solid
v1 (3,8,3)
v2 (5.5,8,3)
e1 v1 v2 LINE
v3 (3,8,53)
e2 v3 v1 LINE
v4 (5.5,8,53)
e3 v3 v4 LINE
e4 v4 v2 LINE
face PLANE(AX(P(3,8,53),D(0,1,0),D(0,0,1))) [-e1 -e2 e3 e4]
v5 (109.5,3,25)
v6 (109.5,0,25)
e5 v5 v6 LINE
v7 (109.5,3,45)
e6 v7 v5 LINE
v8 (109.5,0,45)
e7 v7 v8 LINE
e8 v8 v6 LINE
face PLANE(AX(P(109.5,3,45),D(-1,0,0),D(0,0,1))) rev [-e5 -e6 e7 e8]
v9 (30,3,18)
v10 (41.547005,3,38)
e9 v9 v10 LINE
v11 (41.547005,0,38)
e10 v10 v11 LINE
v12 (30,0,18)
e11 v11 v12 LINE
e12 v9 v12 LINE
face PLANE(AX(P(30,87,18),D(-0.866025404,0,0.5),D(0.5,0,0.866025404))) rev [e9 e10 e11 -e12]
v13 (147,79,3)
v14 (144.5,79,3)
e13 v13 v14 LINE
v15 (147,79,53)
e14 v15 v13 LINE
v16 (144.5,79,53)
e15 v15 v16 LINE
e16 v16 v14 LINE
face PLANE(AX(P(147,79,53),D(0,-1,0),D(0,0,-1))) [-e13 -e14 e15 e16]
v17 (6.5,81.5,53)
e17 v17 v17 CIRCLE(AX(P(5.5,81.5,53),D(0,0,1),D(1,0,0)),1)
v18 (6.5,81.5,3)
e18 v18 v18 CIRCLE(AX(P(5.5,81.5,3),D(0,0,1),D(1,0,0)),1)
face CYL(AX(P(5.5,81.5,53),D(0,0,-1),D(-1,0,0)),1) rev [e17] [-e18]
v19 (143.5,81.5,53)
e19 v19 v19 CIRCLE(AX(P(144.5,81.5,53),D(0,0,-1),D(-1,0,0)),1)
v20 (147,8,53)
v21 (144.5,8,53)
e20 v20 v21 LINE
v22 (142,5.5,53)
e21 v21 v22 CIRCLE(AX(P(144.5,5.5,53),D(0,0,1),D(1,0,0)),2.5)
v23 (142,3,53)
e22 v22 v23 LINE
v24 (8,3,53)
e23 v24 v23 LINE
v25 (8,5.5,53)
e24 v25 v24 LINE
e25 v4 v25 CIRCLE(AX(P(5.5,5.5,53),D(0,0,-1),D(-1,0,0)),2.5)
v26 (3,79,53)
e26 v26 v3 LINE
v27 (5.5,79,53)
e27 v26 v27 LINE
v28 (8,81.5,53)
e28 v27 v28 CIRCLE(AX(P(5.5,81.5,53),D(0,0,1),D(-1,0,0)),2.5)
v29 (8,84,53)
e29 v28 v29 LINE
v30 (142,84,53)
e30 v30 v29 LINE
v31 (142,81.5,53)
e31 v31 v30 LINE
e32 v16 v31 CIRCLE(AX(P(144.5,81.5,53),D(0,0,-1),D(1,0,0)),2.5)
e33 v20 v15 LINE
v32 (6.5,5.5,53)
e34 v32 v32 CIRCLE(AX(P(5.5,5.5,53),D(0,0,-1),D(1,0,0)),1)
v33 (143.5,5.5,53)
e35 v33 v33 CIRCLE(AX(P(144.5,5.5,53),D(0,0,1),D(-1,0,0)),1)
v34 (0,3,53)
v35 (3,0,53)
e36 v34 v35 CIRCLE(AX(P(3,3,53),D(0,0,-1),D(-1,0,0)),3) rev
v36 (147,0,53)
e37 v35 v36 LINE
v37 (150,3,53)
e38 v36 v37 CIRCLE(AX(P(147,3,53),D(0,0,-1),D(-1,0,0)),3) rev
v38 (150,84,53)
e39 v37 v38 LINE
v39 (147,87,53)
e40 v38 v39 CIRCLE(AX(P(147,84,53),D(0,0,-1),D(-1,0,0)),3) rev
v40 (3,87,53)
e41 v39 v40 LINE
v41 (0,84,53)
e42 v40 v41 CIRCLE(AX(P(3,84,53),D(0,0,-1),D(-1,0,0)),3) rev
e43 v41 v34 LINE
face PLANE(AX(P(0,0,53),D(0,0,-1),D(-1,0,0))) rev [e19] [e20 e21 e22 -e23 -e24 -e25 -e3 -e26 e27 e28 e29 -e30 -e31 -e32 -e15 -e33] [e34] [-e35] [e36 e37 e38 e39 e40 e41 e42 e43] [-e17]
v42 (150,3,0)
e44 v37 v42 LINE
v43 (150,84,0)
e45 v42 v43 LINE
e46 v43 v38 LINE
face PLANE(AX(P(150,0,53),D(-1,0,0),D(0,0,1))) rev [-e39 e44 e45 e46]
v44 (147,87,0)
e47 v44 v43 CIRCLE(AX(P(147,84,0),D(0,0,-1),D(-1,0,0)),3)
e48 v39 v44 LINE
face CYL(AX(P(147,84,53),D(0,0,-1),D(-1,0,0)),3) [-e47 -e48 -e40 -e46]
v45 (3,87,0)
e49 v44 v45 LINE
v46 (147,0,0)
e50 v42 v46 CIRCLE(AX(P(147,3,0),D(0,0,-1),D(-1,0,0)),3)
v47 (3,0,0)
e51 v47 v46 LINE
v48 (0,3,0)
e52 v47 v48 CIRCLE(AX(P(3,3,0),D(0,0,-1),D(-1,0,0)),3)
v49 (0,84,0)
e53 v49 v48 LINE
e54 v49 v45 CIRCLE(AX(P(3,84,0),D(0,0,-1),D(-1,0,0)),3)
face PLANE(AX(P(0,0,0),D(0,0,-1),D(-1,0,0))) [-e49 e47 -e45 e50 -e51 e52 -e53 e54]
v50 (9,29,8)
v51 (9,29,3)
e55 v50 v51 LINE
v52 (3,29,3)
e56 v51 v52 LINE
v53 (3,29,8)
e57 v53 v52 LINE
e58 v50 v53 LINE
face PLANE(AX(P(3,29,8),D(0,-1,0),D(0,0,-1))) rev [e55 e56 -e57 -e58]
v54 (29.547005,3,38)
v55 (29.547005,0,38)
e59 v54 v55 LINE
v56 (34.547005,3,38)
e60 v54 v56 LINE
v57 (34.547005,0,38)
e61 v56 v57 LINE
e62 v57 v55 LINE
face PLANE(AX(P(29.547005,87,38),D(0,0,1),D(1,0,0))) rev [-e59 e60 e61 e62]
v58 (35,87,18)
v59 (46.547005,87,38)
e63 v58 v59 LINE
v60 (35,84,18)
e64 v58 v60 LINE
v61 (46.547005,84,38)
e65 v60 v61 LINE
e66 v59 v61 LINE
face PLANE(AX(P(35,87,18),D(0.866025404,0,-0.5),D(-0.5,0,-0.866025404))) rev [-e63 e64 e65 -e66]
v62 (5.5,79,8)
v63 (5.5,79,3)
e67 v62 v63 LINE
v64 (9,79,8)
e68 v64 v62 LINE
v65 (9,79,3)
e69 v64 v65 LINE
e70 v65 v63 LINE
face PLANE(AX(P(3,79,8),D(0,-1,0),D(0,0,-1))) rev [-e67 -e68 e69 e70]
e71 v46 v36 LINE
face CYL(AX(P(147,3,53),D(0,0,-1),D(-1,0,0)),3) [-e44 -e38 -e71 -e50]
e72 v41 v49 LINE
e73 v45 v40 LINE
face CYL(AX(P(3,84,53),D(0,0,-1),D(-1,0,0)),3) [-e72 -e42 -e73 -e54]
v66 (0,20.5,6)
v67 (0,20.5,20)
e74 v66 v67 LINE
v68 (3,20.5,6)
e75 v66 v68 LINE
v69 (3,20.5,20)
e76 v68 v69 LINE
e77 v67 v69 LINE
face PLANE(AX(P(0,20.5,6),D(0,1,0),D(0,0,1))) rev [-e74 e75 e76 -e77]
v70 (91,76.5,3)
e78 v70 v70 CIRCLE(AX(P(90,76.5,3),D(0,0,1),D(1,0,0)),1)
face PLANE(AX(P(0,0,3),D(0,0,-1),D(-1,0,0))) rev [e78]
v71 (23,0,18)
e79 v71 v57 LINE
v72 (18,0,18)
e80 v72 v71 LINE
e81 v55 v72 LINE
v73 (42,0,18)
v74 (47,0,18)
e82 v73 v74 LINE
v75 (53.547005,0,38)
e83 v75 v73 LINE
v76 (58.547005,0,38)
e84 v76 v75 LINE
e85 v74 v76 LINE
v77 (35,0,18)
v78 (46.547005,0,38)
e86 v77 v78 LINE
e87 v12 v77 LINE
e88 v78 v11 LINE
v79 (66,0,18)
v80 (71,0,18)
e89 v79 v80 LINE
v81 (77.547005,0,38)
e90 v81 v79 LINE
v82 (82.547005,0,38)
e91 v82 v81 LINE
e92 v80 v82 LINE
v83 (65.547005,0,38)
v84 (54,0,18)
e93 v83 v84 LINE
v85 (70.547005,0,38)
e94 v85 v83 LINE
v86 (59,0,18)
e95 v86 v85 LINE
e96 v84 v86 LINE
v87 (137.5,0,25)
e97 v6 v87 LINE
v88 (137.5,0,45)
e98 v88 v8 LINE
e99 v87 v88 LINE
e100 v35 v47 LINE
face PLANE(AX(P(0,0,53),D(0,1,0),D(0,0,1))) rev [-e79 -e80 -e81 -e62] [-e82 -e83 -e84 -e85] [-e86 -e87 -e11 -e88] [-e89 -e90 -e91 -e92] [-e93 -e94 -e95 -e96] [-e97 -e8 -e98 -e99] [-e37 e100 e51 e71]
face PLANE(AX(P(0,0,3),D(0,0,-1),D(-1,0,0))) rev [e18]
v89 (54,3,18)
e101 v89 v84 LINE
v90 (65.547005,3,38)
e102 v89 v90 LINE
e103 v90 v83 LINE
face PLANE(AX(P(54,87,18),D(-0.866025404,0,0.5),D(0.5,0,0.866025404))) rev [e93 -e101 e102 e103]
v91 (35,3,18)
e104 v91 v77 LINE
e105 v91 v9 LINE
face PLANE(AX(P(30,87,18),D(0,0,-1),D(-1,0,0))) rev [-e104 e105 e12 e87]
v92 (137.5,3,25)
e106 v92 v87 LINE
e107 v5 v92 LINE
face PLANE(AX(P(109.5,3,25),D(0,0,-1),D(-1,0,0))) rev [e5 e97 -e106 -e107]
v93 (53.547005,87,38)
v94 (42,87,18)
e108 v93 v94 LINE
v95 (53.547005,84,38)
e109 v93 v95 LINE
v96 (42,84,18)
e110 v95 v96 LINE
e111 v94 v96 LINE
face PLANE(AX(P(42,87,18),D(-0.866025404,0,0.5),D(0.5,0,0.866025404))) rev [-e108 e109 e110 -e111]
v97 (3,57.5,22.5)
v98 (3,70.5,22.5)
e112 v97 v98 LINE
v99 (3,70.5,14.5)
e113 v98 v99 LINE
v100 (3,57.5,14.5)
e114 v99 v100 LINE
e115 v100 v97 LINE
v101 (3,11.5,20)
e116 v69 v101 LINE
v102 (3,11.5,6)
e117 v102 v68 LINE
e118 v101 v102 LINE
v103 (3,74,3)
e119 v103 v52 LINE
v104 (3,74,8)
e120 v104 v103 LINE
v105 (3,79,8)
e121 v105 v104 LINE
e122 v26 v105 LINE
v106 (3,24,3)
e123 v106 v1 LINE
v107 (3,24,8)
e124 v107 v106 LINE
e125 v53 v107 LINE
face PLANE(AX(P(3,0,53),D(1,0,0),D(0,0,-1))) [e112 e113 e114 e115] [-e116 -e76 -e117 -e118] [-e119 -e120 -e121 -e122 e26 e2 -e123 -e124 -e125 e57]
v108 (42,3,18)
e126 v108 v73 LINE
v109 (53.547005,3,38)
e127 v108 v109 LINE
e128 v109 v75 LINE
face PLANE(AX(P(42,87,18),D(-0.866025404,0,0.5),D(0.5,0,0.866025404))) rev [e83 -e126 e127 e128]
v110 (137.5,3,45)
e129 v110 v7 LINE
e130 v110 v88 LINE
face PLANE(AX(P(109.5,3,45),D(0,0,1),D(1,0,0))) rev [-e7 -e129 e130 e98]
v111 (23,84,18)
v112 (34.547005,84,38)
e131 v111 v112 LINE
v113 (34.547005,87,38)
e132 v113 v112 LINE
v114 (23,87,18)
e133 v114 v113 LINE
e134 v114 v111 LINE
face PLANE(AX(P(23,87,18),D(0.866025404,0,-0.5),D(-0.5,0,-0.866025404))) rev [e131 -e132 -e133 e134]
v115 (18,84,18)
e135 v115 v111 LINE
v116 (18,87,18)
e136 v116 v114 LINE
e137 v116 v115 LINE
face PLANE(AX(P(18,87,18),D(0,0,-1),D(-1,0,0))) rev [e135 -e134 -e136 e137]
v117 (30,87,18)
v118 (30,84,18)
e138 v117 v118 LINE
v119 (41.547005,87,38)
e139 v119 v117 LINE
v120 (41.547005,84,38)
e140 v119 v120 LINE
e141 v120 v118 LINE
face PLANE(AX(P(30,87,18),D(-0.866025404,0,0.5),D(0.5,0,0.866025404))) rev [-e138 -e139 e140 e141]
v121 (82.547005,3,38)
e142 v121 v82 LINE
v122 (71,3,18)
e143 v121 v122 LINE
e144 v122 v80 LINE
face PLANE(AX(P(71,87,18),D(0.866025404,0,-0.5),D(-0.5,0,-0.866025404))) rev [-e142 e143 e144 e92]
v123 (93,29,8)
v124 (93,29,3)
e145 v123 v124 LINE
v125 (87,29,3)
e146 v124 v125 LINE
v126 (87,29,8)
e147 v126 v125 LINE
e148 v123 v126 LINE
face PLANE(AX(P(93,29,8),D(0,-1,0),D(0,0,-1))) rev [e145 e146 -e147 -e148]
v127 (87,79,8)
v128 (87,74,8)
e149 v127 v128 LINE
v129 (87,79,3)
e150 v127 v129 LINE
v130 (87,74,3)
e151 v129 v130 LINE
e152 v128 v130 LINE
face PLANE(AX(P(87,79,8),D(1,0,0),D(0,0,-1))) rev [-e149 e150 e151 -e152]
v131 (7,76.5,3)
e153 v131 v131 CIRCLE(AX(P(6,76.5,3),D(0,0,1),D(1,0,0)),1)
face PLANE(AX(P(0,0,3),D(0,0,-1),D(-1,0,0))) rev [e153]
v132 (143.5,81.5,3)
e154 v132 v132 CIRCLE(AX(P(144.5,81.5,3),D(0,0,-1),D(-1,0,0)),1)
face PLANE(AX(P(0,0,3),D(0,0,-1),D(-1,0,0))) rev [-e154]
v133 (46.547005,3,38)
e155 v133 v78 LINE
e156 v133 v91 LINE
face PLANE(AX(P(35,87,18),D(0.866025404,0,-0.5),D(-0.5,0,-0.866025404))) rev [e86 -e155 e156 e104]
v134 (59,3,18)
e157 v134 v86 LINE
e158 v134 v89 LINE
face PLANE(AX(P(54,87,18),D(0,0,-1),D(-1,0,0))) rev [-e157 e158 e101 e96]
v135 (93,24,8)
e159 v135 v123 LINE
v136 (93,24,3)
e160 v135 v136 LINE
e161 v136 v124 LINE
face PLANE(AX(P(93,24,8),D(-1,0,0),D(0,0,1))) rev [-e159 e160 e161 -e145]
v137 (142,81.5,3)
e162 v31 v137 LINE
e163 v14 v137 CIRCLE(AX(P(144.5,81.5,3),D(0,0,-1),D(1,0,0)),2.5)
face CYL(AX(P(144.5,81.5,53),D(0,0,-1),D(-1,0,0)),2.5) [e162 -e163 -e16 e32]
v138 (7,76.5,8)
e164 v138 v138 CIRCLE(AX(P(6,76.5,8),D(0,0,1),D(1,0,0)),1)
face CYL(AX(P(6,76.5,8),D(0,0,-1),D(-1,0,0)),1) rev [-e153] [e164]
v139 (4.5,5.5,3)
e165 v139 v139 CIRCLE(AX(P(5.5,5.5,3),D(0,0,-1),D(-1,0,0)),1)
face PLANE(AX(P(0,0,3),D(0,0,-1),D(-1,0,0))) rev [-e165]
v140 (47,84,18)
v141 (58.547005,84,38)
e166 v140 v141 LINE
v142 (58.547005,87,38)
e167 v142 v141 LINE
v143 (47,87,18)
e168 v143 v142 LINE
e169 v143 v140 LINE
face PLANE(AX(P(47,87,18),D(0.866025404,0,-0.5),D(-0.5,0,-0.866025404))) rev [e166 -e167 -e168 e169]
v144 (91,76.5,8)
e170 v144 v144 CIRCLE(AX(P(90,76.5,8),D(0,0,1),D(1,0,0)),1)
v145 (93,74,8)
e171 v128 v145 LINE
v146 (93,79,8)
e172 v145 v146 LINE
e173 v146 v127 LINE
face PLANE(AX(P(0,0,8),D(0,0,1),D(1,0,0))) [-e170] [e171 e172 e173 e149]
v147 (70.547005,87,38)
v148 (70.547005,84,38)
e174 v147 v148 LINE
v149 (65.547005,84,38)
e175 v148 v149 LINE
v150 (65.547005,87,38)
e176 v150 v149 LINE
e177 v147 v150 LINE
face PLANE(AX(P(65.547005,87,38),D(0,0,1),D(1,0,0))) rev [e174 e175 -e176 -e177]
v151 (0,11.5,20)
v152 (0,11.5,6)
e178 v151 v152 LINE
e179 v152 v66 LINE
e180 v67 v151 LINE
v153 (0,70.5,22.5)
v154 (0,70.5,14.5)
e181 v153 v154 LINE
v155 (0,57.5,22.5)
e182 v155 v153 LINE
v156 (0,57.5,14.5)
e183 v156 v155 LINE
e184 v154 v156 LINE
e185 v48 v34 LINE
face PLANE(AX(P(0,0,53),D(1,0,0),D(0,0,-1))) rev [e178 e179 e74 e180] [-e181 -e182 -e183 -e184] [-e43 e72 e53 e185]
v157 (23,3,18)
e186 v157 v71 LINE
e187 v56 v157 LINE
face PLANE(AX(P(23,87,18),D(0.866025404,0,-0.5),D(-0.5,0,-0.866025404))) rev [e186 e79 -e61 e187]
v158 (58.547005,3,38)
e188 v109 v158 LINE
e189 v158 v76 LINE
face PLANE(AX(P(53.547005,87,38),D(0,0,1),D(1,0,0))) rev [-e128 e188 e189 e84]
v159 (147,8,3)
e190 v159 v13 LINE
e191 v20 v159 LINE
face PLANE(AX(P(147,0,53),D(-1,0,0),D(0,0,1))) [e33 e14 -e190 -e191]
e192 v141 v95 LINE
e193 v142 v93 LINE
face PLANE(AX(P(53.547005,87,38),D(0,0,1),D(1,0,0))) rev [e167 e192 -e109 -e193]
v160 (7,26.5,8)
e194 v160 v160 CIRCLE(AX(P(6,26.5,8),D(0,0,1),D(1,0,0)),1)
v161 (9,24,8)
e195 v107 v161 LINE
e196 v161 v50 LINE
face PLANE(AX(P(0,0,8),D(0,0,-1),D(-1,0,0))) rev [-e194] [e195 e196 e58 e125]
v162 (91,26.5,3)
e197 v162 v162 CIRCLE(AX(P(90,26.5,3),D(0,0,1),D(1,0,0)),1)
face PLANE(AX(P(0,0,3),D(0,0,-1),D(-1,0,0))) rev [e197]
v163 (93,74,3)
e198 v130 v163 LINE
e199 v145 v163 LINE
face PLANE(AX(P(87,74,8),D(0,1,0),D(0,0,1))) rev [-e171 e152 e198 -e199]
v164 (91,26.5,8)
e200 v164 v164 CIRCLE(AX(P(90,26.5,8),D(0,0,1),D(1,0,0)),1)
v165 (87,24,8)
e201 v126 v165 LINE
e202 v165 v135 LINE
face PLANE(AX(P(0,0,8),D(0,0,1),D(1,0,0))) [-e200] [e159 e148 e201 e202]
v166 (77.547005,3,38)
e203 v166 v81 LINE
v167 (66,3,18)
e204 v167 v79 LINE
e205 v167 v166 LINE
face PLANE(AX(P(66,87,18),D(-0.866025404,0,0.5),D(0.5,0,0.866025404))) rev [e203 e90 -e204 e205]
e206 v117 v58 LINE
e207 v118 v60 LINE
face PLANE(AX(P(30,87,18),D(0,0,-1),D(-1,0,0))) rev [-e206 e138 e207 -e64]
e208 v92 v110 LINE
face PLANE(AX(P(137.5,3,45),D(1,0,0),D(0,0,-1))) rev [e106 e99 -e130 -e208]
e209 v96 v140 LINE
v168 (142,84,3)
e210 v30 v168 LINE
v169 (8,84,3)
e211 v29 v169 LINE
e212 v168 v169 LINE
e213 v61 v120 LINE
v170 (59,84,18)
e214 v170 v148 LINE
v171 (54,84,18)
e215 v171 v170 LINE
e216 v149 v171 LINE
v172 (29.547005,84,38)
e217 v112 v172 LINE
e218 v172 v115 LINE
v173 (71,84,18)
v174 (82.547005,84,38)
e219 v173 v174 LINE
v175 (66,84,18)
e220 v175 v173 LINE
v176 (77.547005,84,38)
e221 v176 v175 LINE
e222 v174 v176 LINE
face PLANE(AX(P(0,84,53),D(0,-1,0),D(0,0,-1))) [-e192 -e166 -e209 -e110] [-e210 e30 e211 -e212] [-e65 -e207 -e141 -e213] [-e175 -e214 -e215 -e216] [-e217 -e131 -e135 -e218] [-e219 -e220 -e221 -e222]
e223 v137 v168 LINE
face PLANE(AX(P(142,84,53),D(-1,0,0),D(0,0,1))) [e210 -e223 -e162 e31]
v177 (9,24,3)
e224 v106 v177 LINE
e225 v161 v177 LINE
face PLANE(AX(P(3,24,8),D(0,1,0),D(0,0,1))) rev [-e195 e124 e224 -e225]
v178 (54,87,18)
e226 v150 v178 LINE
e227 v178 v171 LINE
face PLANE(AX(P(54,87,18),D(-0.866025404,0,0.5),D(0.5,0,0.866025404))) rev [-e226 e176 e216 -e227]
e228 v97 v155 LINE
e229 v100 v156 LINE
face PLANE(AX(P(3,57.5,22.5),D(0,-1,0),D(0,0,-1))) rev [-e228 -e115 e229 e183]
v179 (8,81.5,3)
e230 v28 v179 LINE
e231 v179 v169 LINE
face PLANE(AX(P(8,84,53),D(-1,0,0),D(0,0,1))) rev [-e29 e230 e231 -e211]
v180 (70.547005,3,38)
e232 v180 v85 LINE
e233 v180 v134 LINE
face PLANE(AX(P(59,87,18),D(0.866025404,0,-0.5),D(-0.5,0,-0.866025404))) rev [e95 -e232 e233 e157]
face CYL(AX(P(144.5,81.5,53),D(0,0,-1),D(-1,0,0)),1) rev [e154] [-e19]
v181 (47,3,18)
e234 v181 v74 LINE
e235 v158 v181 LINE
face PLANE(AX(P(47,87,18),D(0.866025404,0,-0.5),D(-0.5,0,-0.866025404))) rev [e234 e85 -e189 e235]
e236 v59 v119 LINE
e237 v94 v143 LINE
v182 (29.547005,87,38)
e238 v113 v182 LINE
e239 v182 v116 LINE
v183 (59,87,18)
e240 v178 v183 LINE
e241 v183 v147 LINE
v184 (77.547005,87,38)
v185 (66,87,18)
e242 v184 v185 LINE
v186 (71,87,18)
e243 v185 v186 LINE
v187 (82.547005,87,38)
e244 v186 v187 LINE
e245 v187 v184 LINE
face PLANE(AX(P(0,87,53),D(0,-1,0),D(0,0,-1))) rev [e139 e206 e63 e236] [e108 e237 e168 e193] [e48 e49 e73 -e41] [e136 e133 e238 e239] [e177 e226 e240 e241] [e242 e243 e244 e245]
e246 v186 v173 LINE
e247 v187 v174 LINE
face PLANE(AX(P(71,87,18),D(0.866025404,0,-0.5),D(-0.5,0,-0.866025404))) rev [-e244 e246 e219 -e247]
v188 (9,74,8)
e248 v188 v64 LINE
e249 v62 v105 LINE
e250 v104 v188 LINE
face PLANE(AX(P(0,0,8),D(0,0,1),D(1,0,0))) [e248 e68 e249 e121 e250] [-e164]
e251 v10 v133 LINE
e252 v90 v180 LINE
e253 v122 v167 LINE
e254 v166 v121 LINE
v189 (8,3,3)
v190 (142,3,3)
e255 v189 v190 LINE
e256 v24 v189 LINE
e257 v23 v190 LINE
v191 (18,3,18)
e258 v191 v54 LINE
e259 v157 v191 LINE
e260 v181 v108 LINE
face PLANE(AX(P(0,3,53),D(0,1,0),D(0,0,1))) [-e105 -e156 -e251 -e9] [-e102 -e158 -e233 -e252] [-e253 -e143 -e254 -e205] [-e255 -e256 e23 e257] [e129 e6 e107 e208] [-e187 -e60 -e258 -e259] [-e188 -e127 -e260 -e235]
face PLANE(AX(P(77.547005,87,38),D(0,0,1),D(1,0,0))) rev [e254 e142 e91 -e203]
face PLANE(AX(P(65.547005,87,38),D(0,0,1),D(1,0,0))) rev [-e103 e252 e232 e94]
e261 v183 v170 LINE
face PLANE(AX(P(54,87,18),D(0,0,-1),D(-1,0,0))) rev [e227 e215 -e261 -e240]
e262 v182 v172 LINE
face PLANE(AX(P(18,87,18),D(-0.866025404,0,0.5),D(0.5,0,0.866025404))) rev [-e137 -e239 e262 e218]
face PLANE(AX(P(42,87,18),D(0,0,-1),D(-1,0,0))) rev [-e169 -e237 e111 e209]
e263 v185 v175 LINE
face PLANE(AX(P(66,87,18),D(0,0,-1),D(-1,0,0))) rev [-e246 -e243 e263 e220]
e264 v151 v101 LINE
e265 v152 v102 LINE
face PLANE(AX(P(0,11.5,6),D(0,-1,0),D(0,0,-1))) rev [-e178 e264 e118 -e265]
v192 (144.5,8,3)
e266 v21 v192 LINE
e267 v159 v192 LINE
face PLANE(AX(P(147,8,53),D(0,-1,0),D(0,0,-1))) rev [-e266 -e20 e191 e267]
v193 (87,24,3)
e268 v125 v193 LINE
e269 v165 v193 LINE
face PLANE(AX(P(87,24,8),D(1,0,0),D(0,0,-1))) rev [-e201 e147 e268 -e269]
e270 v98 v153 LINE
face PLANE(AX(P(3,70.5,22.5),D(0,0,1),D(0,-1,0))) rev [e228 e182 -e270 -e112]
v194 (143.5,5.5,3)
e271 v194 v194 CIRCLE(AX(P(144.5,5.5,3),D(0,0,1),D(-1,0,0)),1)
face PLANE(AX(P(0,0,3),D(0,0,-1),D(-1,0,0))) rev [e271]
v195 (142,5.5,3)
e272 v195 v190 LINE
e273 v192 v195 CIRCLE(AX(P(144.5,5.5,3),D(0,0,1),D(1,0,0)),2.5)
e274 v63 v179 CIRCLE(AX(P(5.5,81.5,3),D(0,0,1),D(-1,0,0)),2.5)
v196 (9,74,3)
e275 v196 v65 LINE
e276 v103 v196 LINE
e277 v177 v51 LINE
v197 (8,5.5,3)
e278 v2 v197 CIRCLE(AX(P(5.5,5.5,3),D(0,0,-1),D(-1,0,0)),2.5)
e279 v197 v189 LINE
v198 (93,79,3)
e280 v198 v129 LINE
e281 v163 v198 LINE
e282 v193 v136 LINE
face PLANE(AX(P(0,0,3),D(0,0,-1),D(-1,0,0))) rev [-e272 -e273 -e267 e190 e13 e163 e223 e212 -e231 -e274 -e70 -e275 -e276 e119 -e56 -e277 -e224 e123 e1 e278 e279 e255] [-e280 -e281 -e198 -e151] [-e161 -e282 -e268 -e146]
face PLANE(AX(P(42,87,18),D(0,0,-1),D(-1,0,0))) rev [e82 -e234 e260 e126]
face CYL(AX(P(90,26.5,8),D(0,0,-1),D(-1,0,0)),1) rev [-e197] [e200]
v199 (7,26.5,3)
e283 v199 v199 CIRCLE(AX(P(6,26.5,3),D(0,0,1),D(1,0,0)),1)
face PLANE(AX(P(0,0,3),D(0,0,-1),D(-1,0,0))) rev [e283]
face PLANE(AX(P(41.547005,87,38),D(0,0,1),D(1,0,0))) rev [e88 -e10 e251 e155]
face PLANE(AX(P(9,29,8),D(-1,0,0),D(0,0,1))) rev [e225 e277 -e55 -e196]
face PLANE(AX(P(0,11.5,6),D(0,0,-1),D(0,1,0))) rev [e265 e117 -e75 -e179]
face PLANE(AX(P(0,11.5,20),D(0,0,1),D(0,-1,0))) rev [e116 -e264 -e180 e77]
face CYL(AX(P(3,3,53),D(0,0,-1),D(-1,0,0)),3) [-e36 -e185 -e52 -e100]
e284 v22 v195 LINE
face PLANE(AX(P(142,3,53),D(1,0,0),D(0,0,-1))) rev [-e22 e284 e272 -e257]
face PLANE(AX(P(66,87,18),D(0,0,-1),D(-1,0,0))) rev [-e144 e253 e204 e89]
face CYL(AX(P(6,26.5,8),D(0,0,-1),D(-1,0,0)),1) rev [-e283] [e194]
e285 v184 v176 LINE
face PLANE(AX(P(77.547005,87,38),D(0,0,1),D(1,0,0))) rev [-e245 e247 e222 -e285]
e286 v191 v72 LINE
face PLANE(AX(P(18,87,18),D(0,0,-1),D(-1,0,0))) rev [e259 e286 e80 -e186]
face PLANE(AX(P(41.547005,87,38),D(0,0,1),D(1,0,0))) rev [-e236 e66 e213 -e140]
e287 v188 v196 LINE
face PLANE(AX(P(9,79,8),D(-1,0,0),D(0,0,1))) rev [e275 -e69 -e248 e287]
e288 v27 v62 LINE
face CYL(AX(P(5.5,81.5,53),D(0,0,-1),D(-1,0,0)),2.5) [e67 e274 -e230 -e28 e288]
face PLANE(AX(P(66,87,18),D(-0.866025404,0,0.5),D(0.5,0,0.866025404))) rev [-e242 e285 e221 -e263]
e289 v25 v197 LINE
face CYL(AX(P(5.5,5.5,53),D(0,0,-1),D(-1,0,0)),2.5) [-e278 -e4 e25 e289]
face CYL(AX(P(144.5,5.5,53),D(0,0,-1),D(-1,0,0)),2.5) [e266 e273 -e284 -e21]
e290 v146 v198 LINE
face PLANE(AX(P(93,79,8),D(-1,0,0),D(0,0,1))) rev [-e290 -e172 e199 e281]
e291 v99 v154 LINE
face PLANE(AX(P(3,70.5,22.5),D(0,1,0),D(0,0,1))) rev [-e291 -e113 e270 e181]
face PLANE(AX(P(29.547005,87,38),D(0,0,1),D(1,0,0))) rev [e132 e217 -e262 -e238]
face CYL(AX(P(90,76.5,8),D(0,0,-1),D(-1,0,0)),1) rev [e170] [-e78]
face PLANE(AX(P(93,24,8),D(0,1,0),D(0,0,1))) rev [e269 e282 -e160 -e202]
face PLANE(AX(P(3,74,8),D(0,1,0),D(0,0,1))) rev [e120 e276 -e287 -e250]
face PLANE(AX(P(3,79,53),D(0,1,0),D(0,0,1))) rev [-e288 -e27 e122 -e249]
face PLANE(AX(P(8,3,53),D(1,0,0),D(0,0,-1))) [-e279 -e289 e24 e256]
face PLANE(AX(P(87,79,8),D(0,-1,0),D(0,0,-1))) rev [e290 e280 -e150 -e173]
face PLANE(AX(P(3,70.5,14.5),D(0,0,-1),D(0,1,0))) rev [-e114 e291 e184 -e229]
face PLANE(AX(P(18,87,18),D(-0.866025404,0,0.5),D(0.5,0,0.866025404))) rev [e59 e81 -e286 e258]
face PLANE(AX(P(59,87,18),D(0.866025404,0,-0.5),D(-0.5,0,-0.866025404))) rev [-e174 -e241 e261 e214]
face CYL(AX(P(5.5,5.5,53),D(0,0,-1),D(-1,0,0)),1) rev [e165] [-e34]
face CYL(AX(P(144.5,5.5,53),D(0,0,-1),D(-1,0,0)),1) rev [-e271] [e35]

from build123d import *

# Parameters (mm, degrees)
SKETCH1_W               = 150
SKETCH1_H               = 87
BODY_FRAME_DEPTH        = 53
BODY_EDGES_R            = 3
SHELL1_START            = 3
SHELL1_OUTLINE_W        = 81
SHELL1_OUTLINE_H        = 50
SHELL1_DEPTH            = 144
SKETCH3_R               = 1
SCREW_HOLE_DEPTH        = 50
MIRROR2_COPY_1_SKETCH_R = 1
MIRROR2_COPY_1_DEPTH    = 50
SKETCH4_W               = 6
SKETCH4_H               = 5
SKETCH4_R               = 1
BOSS_EXTRUDE3_DEPTH     = 5
SKETCH5_W               = 14
SKETCH5_H               = 9
SWITCH_DEPTH            = 179.849098404
SKETCH6_W               = 28
SKETCH6_H               = 20
AC_IN_DEPTH             = 3
SKETCH8_W               = 8
SKETCH8_H               = 13
PROGRAM_PORT_DEPTH      = 3
CUT_EXTRUDE1_DEPTH      = 182.322916367
LPATTERN1_COUNT         = 5
LPATTERN1_PITCH         = 12


# Read off the part's stored shape, not the designer's step: Shell1
with BuildPart() as part:
    # Sketch1 → Body_frame (new body)
    with BuildSketch(Plane.XY):
        with Locations((75, 43.5)):
            Rectangle(SKETCH1_W, SKETCH1_H)
    extrude(amount=BODY_FRAME_DEPTH)

    # body_edges
    body_edges_edges = [part.edges().sort_by_distance(p)[0] for p in [
        (0, 87, 26.5),
        (150, 87, 26.5),
        (150, 0, 26.5),
        (0, 0, 26.5),
    ]]
    fillet(body_edges_edges, radius=BODY_EDGES_R)

    # Shell1 outline → Shell1 (cut)
    with BuildSketch(Plane.YZ.offset(SHELL1_START)):
        with Locations((43.5, 28)):
            Rectangle(SHELL1_OUTLINE_W, SHELL1_OUTLINE_H)
    extrude(amount=SHELL1_DEPTH, mode=Mode.SUBTRACT)

    # Sketch3 → screw_hole (add)
    with BuildSketch(Plane.XY.offset(3)):
        with BuildLine():
            Line((3, 84), (8, 84))
            Line((8, 84), (8, 81.5))
            ThreePointArc((8, 81.5), (7.267766953, 79.732233047), (5.5, 79))
            Line((5.5, 79), (3, 79))
            Line((3, 79), (3, 84))
        make_face()
        with Locations((5.5, 81.5)):
            Circle(SKETCH3_R, mode=Mode.SUBTRACT)
    screw_hole = extrude(amount=SCREW_HOLE_DEPTH)

    # Mirror1: screw_hole across plane
    add(screw_hole.mirror(Plane.ZY.offset(-75)))

    # Mirror2: screw_hole across plane
    add(screw_hole.mirror(Plane.ZX.offset(43.5)))

    # Mirror2 copy 1 sketch → Mirror2 copy 1 (add)
    with BuildSketch(Plane(origin=(150, 87, 3), x_dir=(-1, 0, 0), z_dir=(0, 0, 1))):
        with BuildLine():
            Line((3, 84), (8, 84))
            Line((8, 84), (8, 81.5))
            ThreePointArc((8, 81.5), (7.267766953, 79.732233047), (5.5, 79))
            Line((5.5, 79), (3, 79))
            Line((3, 79), (3, 84))
        make_face()
        with Locations((5.5, 81.5)):
            Circle(MIRROR2_COPY_1_SKETCH_R, mode=Mode.SUBTRACT)
    extrude(amount=MIRROR2_COPY_1_DEPTH)

    # Sketch4 → Boss-Extrude3 (add)
    # profile 1 of 4: a face of its own
    with BuildSketch(Plane.XY.offset(3)):
        with Locations((6, 76.5)):
            Rectangle(SKETCH4_W, SKETCH4_H)
        with Locations((6, 76.5)):
            Circle(SKETCH4_R, mode=Mode.SUBTRACT)
    # profile 2 of 4: a face of its own
    with BuildSketch(Plane.XY.offset(3)):
        with Locations((90, 76.5)):
            Rectangle(SKETCH4_W, SKETCH4_H)
        with Locations((90, 76.5)):
            Circle(SKETCH4_R, mode=Mode.SUBTRACT)
    # profile 3 of 4: a face of its own
    with BuildSketch(Plane.XY.offset(3)):
        with Locations((6, 26.5)):
            Rectangle(SKETCH4_W, SKETCH4_H)
        with Locations((6, 26.5)):
            Circle(SKETCH4_R, mode=Mode.SUBTRACT)
    # profile 4 of 4: a face of its own
    with BuildSketch(Plane.XY.offset(3)):
        with Locations((90, 26.5)):
            Rectangle(SKETCH4_W, SKETCH4_H)
        with Locations((90, 26.5)):
            Circle(SKETCH4_R, mode=Mode.SUBTRACT)
    extrude(amount=BOSS_EXTRUDE3_DEPTH)

    # Sketch5 → switch (cut, through all)
    with BuildSketch(Plane(origin=(3, 0, 0), x_dir=(0, 0, -1), z_dir=(1, 0, 0))):
        with Locations((-13, 16)):
            Rectangle(SKETCH5_W, SKETCH5_H)
    extrude(amount=-SWITCH_DEPTH, mode=Mode.SUBTRACT)

    # Sketch6 → AC_IN (cut)
    with BuildSketch(Plane.XZ):
        with Locations((123.5, 35)):
            Rectangle(SKETCH6_W, SKETCH6_H)
    extrude(amount=-AC_IN_DEPTH, mode=Mode.SUBTRACT)

    # Sketch8 → Program_port (cut)
    with BuildSketch(Plane.ZY):
        with Locations((18.5, 64)):
            Rectangle(SKETCH8_W, SKETCH8_H)
    extrude(amount=-PROGRAM_PORT_DEPTH, mode=Mode.SUBTRACT)

    # Sketch9 → Cut-Extrude1 (cut, through all)
    with BuildSketch(Plane.XZ):
        Polygon((18, 18), (23, 18), (34.547005384, 38), (29.547005384, 38), align=None)
    cut_extrude1 = extrude(amount=-CUT_EXTRUDE1_DEPTH, mode=Mode.SUBTRACT)

    # LPattern1: Cut-Extrude1 ×5
    with Locations(*[(i * LPATTERN1_PITCH, 0, 0) for i in range(1, LPATTERN1_COUNT)]):
        add(cut_extrude1, mode=Mode.SUBTRACT)


solid = part.part
